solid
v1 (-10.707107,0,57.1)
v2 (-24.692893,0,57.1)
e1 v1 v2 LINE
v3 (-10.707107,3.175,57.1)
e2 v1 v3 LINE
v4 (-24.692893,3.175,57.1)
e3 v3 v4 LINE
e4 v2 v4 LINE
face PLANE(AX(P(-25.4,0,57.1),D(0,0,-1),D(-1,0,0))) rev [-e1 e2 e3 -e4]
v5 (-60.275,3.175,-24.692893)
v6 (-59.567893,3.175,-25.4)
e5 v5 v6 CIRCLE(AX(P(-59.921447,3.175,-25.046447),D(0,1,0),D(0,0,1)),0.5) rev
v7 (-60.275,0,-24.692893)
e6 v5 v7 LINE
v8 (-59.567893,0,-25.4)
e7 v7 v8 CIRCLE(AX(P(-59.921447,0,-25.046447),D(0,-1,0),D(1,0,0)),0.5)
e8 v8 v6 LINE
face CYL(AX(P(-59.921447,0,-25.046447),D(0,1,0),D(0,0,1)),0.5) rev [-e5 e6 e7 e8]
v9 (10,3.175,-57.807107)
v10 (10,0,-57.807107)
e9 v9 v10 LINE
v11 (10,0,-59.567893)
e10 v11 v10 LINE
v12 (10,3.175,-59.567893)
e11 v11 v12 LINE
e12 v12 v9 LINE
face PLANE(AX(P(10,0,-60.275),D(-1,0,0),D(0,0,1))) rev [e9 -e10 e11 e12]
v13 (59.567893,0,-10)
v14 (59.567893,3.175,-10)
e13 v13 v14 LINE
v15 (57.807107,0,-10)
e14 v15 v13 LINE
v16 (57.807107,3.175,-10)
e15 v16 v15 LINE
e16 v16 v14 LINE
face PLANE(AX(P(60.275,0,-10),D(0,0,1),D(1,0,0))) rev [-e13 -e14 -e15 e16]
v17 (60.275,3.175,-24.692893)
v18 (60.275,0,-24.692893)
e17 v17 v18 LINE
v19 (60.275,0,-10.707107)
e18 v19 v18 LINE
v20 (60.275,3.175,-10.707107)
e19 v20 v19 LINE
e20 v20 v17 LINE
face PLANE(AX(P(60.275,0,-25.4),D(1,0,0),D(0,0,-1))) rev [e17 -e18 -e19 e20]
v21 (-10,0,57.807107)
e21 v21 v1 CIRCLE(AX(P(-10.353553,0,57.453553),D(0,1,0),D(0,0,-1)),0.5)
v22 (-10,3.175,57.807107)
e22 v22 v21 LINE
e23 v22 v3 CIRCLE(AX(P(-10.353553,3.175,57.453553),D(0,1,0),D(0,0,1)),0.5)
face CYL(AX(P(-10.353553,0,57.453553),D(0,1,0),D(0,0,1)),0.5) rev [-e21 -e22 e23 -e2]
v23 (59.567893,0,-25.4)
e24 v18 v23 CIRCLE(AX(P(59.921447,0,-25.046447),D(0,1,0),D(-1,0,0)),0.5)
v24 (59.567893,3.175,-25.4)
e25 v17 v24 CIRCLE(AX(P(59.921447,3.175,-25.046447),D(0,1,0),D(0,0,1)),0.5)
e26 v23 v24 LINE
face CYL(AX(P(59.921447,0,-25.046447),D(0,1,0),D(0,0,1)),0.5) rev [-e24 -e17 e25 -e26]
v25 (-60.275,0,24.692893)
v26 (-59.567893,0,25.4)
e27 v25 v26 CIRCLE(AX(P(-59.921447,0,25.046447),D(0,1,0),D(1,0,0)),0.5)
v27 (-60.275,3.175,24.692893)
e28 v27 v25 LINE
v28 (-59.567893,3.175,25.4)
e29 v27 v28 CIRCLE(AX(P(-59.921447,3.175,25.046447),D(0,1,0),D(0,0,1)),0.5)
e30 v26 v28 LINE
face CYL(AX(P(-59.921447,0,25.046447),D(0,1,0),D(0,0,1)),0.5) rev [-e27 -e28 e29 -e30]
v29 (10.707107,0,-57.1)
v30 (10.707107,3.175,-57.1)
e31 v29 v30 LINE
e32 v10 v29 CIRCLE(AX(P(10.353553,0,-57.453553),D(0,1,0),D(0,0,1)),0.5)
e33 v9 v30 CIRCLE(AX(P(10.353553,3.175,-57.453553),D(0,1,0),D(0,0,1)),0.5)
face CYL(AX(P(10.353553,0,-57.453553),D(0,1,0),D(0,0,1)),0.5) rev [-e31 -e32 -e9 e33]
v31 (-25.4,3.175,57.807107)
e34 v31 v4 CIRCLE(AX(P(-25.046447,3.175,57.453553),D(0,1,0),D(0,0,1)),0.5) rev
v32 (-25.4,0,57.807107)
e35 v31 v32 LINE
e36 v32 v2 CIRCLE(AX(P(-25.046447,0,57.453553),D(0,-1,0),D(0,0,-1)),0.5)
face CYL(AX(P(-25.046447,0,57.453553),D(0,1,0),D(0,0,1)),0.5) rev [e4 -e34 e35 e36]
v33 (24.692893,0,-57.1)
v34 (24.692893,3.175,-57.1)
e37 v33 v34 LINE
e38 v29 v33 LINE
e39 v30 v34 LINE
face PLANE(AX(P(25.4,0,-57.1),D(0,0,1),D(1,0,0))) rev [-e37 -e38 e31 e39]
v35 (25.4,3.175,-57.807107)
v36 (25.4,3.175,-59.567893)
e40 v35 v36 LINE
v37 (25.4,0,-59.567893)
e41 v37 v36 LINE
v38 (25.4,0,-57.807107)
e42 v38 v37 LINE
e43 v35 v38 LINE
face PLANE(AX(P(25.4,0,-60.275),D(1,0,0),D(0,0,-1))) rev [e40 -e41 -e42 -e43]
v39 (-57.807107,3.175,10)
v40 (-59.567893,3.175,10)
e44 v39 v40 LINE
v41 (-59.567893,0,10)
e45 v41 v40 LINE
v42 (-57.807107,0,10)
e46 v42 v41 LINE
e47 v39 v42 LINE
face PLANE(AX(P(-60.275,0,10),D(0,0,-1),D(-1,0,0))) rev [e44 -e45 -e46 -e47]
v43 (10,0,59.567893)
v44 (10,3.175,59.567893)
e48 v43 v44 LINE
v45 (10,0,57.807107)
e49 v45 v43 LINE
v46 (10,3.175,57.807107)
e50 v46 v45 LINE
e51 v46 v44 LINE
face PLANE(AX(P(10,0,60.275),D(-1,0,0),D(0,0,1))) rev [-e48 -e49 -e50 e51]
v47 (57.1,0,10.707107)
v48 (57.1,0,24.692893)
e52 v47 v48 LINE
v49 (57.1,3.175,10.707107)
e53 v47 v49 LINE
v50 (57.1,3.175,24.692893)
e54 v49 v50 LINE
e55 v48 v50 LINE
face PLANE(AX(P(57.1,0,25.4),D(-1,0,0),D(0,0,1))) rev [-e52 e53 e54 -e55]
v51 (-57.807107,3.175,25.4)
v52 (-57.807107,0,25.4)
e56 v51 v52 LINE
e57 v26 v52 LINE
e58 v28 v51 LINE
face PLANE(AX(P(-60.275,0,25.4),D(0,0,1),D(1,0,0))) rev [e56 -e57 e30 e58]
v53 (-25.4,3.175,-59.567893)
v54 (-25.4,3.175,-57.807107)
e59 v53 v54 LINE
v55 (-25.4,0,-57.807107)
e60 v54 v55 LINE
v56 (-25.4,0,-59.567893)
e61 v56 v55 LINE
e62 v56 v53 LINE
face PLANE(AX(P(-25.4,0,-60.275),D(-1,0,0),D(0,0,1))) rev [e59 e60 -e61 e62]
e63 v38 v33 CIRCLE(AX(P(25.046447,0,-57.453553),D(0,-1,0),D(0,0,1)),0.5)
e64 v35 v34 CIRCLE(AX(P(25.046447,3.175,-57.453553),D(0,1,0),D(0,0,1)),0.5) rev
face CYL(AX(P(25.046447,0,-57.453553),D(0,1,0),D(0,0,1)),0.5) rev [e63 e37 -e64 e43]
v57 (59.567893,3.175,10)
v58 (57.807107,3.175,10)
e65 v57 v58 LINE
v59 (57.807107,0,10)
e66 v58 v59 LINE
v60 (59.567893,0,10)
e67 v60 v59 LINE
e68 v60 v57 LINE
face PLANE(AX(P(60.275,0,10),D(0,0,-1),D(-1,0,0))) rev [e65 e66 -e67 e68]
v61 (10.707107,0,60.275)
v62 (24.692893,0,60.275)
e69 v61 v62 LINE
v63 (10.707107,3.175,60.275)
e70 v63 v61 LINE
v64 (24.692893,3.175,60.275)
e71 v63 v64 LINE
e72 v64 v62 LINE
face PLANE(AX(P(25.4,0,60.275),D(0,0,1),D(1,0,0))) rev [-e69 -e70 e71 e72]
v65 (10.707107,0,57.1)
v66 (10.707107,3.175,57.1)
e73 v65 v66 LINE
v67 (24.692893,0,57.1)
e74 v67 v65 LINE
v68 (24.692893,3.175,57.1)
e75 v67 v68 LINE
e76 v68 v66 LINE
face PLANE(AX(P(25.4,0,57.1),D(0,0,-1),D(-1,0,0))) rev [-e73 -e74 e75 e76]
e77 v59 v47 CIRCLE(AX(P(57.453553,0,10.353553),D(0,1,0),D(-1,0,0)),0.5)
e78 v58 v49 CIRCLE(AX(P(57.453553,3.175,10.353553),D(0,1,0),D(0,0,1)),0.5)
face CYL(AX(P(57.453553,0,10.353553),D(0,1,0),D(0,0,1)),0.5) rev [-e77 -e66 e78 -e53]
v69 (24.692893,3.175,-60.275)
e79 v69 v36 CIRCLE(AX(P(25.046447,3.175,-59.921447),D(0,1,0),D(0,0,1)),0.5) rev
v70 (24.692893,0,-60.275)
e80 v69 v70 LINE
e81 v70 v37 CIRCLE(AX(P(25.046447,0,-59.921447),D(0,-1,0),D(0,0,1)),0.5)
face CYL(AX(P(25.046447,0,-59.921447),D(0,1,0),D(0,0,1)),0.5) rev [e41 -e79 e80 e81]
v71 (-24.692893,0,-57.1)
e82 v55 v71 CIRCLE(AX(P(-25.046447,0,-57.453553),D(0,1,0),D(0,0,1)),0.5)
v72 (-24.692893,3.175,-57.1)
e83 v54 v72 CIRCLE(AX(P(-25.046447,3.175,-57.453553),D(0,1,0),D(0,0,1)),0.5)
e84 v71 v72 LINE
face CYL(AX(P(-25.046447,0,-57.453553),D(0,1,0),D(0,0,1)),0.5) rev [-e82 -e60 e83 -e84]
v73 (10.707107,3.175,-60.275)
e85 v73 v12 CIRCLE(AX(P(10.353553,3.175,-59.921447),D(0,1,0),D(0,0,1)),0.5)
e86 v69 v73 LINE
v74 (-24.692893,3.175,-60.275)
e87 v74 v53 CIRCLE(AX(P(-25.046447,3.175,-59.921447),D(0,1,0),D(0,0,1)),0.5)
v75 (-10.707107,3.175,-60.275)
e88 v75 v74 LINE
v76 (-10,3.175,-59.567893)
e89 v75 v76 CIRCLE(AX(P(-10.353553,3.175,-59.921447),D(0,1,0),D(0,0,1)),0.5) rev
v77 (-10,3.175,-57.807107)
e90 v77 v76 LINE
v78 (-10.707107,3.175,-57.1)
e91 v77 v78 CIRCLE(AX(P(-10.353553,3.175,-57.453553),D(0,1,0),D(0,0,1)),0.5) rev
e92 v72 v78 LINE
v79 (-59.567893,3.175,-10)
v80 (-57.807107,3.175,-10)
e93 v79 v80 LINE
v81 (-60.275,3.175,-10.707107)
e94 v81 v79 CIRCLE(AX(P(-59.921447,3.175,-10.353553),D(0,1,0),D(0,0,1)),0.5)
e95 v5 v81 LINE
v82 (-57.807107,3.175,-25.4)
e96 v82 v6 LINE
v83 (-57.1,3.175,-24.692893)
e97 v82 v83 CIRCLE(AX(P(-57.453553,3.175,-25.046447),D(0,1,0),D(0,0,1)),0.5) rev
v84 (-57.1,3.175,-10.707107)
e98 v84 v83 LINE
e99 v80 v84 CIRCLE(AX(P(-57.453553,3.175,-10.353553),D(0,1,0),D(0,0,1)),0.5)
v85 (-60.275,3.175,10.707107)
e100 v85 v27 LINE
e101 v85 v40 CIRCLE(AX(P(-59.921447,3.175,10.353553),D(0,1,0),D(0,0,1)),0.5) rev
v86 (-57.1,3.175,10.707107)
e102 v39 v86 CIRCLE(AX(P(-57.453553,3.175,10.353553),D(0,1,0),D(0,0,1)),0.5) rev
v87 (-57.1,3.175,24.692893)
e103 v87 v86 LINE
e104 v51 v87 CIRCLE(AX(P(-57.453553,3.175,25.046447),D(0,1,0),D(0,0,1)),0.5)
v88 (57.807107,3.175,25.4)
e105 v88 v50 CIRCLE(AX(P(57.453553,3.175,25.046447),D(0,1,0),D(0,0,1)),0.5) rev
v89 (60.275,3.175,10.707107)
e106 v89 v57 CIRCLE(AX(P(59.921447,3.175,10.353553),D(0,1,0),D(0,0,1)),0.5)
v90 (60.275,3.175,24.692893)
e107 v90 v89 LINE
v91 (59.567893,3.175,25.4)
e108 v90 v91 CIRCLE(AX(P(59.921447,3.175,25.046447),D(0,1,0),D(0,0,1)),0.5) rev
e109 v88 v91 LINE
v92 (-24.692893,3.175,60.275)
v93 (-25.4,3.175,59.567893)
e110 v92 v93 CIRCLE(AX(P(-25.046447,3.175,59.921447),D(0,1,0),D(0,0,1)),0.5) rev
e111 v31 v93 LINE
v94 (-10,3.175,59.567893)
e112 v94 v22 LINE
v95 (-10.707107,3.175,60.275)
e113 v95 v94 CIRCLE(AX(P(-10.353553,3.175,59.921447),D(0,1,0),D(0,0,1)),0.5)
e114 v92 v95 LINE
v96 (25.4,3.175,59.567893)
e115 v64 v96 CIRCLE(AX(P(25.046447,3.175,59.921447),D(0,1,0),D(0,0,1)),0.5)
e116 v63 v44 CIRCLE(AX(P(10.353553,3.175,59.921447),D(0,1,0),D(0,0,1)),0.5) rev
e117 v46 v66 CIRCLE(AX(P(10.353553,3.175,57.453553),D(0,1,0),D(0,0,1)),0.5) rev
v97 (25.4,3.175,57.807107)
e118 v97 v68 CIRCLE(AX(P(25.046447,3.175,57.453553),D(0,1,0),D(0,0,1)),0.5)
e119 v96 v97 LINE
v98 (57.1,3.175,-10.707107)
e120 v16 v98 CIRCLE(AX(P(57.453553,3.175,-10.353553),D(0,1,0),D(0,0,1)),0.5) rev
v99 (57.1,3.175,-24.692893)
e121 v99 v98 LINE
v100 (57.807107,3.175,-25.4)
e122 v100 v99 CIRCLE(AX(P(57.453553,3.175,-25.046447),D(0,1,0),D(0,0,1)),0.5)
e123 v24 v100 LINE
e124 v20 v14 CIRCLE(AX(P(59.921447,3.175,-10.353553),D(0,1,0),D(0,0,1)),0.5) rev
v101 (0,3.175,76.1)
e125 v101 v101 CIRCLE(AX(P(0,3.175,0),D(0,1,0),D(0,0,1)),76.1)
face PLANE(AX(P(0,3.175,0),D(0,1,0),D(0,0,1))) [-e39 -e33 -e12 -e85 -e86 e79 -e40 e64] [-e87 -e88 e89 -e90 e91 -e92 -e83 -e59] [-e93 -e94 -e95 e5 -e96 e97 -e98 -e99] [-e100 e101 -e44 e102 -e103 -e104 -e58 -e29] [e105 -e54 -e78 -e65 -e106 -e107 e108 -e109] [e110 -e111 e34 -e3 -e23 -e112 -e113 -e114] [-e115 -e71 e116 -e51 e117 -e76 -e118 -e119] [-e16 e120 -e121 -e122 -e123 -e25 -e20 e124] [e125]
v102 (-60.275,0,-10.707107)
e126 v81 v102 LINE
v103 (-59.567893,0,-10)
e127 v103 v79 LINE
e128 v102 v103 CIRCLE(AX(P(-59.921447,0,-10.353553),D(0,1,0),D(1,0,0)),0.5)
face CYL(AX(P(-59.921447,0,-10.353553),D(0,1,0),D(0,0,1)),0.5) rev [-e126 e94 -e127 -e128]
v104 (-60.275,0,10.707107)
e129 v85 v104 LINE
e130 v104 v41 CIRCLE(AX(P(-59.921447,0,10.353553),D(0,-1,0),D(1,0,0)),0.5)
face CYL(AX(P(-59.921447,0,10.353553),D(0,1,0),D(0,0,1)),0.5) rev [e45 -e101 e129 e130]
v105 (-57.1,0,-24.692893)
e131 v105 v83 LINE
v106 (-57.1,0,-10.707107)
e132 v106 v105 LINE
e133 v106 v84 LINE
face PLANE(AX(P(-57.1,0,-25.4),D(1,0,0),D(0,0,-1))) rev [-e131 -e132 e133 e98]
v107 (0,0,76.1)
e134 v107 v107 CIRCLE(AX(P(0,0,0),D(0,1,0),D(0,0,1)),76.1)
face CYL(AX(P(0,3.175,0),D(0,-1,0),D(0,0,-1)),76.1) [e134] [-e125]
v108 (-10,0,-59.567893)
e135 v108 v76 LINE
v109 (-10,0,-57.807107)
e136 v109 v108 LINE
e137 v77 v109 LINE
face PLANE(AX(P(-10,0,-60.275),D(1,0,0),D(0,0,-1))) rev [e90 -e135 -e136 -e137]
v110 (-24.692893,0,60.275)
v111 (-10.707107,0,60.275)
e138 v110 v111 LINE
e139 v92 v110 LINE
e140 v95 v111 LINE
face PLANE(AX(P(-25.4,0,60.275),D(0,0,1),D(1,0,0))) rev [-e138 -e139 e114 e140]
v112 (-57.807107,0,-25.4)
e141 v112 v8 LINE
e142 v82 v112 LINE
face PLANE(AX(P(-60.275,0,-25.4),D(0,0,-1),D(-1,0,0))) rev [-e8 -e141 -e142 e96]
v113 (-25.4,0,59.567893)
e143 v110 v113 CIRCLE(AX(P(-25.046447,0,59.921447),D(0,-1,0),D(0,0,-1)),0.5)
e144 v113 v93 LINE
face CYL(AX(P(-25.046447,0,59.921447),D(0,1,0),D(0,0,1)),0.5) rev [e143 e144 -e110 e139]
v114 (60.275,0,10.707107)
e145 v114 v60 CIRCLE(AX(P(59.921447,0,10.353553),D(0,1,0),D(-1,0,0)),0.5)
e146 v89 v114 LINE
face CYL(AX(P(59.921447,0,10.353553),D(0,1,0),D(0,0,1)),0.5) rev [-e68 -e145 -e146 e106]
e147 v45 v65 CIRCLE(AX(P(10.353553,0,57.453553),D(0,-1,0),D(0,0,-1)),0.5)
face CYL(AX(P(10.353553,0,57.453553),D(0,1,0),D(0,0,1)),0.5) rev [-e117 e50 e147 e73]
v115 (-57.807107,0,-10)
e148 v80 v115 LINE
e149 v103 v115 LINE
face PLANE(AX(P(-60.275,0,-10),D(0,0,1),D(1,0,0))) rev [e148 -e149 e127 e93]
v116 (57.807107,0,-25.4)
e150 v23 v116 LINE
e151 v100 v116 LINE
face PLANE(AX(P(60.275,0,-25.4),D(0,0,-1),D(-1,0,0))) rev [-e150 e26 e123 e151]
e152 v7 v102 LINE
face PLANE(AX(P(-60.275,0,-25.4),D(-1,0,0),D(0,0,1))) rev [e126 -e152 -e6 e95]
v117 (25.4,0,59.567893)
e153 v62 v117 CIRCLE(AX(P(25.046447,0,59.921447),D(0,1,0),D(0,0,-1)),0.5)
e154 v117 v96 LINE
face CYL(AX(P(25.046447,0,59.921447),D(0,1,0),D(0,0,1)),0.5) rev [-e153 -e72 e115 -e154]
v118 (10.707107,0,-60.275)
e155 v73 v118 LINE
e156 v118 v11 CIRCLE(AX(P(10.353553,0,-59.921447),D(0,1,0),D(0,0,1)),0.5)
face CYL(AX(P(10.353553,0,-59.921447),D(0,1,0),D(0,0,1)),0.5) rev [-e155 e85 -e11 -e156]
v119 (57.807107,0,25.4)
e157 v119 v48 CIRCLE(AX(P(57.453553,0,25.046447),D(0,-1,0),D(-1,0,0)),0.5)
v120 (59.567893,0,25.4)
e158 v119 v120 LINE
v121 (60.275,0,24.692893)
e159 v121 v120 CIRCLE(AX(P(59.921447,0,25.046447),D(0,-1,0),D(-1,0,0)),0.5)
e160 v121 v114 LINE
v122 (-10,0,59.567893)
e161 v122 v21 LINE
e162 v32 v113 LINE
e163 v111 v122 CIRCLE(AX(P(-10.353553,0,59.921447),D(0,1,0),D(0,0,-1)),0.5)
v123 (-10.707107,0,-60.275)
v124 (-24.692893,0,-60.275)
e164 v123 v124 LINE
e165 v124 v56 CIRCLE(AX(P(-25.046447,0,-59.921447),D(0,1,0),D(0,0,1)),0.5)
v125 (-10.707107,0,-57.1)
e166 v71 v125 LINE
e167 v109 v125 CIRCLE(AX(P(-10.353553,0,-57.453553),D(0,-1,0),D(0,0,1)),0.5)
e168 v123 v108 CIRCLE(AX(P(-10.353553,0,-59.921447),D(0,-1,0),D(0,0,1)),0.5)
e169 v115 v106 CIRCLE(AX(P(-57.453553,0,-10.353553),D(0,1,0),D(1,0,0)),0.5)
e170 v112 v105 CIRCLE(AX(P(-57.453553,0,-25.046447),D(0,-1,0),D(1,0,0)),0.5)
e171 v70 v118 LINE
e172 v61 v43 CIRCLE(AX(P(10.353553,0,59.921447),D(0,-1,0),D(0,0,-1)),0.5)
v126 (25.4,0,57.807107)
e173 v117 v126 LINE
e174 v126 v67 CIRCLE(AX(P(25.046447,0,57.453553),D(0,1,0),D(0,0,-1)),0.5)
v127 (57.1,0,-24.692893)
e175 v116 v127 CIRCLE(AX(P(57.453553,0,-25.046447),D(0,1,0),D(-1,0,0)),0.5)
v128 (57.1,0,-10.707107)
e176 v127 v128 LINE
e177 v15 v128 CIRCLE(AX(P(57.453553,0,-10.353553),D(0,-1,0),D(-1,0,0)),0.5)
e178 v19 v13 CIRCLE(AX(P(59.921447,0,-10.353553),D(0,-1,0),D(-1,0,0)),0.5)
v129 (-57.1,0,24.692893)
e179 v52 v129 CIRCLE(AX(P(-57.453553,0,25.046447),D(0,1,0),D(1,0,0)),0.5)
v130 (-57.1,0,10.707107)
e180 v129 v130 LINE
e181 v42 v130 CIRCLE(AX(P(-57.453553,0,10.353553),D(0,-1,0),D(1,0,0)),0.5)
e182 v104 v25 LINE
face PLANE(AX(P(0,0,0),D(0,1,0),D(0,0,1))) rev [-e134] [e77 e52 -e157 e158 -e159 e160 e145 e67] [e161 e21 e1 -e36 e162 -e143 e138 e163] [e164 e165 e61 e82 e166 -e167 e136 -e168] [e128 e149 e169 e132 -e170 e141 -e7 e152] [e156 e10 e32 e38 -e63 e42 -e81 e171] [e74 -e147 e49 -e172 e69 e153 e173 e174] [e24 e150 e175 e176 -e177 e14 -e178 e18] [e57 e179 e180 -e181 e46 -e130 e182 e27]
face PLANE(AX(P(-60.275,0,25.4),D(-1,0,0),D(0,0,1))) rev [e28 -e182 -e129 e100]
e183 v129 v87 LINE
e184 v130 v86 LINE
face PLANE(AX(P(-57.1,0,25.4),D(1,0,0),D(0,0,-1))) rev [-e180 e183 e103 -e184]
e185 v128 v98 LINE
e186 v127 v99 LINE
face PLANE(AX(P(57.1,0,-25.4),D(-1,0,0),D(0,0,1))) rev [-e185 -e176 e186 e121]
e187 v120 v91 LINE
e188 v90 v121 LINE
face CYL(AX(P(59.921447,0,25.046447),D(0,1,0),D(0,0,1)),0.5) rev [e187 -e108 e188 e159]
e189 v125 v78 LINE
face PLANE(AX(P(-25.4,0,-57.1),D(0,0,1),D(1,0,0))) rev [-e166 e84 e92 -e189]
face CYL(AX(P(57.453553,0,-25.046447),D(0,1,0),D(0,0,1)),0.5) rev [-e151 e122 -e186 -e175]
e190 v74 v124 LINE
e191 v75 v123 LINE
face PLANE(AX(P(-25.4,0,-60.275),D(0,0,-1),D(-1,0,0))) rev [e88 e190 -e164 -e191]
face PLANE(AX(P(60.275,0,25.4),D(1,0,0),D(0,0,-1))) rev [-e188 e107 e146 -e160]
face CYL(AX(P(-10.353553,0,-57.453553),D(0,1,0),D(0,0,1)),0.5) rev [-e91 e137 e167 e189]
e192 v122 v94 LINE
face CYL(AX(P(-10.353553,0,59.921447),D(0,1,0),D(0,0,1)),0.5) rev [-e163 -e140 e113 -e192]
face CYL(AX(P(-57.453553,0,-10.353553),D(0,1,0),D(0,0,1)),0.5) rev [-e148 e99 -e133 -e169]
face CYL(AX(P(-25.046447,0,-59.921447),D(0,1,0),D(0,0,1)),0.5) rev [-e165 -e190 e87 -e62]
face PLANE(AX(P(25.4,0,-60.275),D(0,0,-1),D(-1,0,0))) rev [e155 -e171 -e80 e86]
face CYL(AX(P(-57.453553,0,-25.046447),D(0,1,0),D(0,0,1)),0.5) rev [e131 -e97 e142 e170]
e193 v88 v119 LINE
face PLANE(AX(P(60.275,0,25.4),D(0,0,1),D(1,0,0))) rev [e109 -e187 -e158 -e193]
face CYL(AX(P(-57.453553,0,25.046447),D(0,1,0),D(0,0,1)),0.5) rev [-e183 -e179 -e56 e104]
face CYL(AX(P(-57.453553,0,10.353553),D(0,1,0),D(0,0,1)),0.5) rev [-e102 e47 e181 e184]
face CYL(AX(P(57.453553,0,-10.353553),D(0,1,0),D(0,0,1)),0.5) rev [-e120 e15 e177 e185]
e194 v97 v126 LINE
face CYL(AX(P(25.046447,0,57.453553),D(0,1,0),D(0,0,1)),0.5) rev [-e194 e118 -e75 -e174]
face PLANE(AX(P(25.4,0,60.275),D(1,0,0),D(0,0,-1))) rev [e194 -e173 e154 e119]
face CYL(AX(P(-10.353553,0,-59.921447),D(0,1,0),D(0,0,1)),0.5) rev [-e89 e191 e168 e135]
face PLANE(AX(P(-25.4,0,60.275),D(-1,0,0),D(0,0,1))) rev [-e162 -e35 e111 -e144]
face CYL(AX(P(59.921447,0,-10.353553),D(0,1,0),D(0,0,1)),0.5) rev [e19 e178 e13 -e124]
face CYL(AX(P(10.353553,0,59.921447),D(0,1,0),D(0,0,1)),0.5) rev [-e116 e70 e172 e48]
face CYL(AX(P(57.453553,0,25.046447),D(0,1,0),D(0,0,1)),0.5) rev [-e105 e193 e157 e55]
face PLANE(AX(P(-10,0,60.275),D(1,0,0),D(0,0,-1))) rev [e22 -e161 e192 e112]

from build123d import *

# Parameters (mm, degrees)
SKETCH1_R                   = 76.1
BOSS_EXTRUDE1_DEPTH         = 3.175
SKETCH3_W                   = 15.4
SKETCH3_H                   = 3.175
CUT_EXTRUDE1_DEPTH          = 108.66847554
SKETCH4_R                   = 0.5
CUT_EXTRUDE2_DEPTH          = 108.66847554
SKETCH_PATTERN1_DEPTH       = 3.175
CIRPATTERN1_COUNT           = 4
CIRPATTERN1_COPY_1_SKETCH_R = 0.5
CIRPATTERN1_COPY_1_DEPTH    = 108.66847554
CIRPATTERN1_COPY_2_SKETCH_R = 0.5
CIRPATTERN1_COPY_2_DEPTH    = 108.66847554
CIRPATTERN1_COPY_3_SKETCH_R = 0.5
CIRPATTERN1_COPY_3_DEPTH    = 108.66847554
CIRPATTERN1_COPY_4_DEPTH    = 3.175
CIRPATTERN1_COPY_5_DEPTH    = 3.175
CIRPATTERN1_COPY_6_DEPTH    = 3.175


# Read off the part's stored shape, not the designer's step: Sketch-Pattern1
with BuildPart() as part:
    # Sketch1 → Boss-Extrude1 (new body)
    with BuildSketch(Plane(origin=(0, 0, 0), x_dir=(1, 0, 0), z_dir=(0, 1, 0))):
        with Locations(Location((0, 0, 0), (0, 0, 270))):
            Circle(SKETCH1_R)
    extrude(amount=BOSS_EXTRUDE1_DEPTH)

    # Sketch3 → Cut-Extrude1 (cut, symmetric)
    with BuildSketch(Plane(origin=(0, 3.175, 0), x_dir=(1, 0, 0), z_dir=(0, 1, 0))):
        with Locations((-17.7, 58.6875)):
            Rectangle(SKETCH3_W, SKETCH3_H)
        with Locations((17.7, 58.6875)):
            Rectangle(SKETCH3_W, SKETCH3_H)
    cut_extrude1 = extrude(amount=CUT_EXTRUDE1_DEPTH, both=True, mode=Mode.SUBTRACT)

    # Sketch4 → Cut-Extrude2 (cut, symmetric)
    with BuildSketch(Plane(origin=(0, 3.175, 0), x_dir=(1, 0, 0), z_dir=(0, 1, 0))):
        with Locations((-25.046446609, 59.921446609)):
            Circle(SKETCH4_R)
        with Locations((-25.046446609, 57.453553391)):
            Circle(SKETCH4_R)
    cut_extrude2 = extrude(amount=CUT_EXTRUDE2_DEPTH, both=True, mode=Mode.SUBTRACT)

    # Sketch-Pattern1 outline → Sketch-Pattern1 (cut)
    with BuildSketch(Plane(origin=(0, 0, 0), x_dir=(1, 0, 0), z_dir=(0, 1, 0))):
        with BuildLine():
            Line((10, 60.275), (10.707106781, 60.275))
            ThreePointArc((10.707106781, 60.275), (10.353553391, 60.421446609), (10, 60.275))
        make_face()
        with BuildLine():
            Line((10.707106781, 57.1), (10, 57.1))
            ThreePointArc((10, 57.1), (10.353553391, 56.953553391), (10.707106781, 57.1))
        make_face()
        with BuildLine():
            Line((10, 57.1), (10, 57.807106781))
            ThreePointArc((10, 57.807106781), (9.853553391, 57.453553391), (10, 57.1))
        make_face()
        with BuildLine():
            Line((10, 59.567893219), (10, 60.275))
            ThreePointArc((10, 60.275), (9.853553391, 59.921446609), (10, 59.567893219))
        make_face()
    sketch_pattern1 = extrude(amount=SKETCH_PATTERN1_DEPTH, mode=Mode.SUBTRACT)

    # Mirror1: Cut-Extrude2, Sketch-Pattern1 across plane
    add(cut_extrude2.mirror(Plane(origin=(0, 0, 0), x_dir=(0, 0, 1), z_dir=(1, 0, 0))), mode=Mode.SUBTRACT)
    add(sketch_pattern1.mirror(Plane(origin=(0, 0, 0), x_dir=(0, 0, 1), z_dir=(1, 0, 0))), mode=Mode.SUBTRACT)

    # CirPattern1: Cut-Extrude1, Cut-Extrude2, Sketch-Pattern1 ×4 about axis
    cirpattern1_axis = Axis((0, 0, 0), (0, 1, 0))
    add([cut_extrude1.rotate(cirpattern1_axis, i * 360 / CIRPATTERN1_COUNT) for i in range(1, CIRPATTERN1_COUNT)], mode=Mode.SUBTRACT)
    add([cut_extrude2.rotate(cirpattern1_axis, i * 360 / CIRPATTERN1_COUNT) for i in range(1, CIRPATTERN1_COUNT)], mode=Mode.SUBTRACT)
    add([sketch_pattern1.rotate(cirpattern1_axis, i * 360 / CIRPATTERN1_COUNT) for i in range(1, CIRPATTERN1_COUNT)], mode=Mode.SUBTRACT)

    # CirPattern1 copy 1 sketch → CirPattern1 copy 1 (cut, symmetric)
    with BuildSketch(Plane.ZX.offset(3.175)):
        with Locations((-25.046446609, -59.921446609)):
            Circle(CIRPATTERN1_COPY_1_SKETCH_R)
        with Locations((-25.046446609, -57.453553391)):
            Circle(CIRPATTERN1_COPY_1_SKETCH_R)
    extrude(amount=CIRPATTERN1_COPY_1_DEPTH, both=True, mode=Mode.SUBTRACT)

    # CirPattern1 copy 2 sketch → CirPattern1 copy 2 (cut, symmetric)
    with BuildSketch(Plane(origin=(0, 3.175, 0), x_dir=(1, 0, 0), z_dir=(0, 1, 0))):
        with Locations((-25.046446609, -59.921446609)):
            Circle(CIRPATTERN1_COPY_2_SKETCH_R)
        with Locations((-25.046446609, -57.453553391)):
            Circle(CIRPATTERN1_COPY_2_SKETCH_R)
    extrude(amount=CIRPATTERN1_COPY_2_DEPTH, both=True, mode=Mode.SUBTRACT)

    # CirPattern1 copy 3 sketch → CirPattern1 copy 3 (cut, symmetric)
    with BuildSketch(Plane(origin=(0, 3.175, 0), x_dir=(0, 0, -1), z_dir=(0, 1, 0))):
        with Locations((-25.046446609, -59.921446609)):
            Circle(CIRPATTERN1_COPY_3_SKETCH_R)
        with Locations((-25.046446609, -57.453553391)):
            Circle(CIRPATTERN1_COPY_3_SKETCH_R)
    extrude(amount=CIRPATTERN1_COPY_3_DEPTH, both=True, mode=Mode.SUBTRACT)

    # CirPattern1 copy 4 sketch → CirPattern1 copy 4 (cut)
    with BuildSketch(Plane.ZX):
        with BuildLine():
            Line((10, -60.275), (10.707106781, -60.275))
            ThreePointArc((10.707106781, -60.275), (10.353553391, -60.421446609), (10, -60.275))
        make_face()
        with BuildLine():
            Line((10.707106781, -57.1), (10, -57.1))
            ThreePointArc((10, -57.1), (10.353553391, -56.953553391), (10.707106781, -57.1))
        make_face()
        with BuildLine():
            Line((10, -57.1), (10, -57.807106781))
            ThreePointArc((10, -57.807106781), (9.853553391, -57.453553391), (10, -57.1))
        make_face()
        with BuildLine():
            Line((10, -59.567893219), (10, -60.275))
            ThreePointArc((10, -60.275), (9.853553391, -59.921446609), (10, -59.567893219))
        make_face()
    extrude(amount=CIRPATTERN1_COPY_4_DEPTH, mode=Mode.SUBTRACT)

    # CirPattern1 copy 5 sketch → CirPattern1 copy 5 (cut)
    with BuildSketch(Plane(origin=(0, 0, 0), x_dir=(1, 0, 0), z_dir=(0, 1, 0))):
        with BuildLine():
            Line((10, -60.275), (10.707106781, -60.275))
            ThreePointArc((10.707106781, -60.275), (10.353553391, -60.421446609), (10, -60.275))
        make_face()
        with BuildLine():
            Line((10.707106781, -57.1), (10, -57.1))
            ThreePointArc((10, -57.1), (10.353553391, -56.953553391), (10.707106781, -57.1))
        make_face()
        with BuildLine():
            Line((10, -57.1), (10, -57.807106781))
            ThreePointArc((10, -57.807106781), (9.853553391, -57.453553391), (10, -57.1))
        make_face()
        with BuildLine():
            Line((10, -59.567893219), (10, -60.275))
            ThreePointArc((10, -60.275), (9.853553391, -59.921446609), (10, -59.567893219))
        make_face()
    extrude(amount=CIRPATTERN1_COPY_5_DEPTH, mode=Mode.SUBTRACT)

    # CirPattern1 copy 6 sketch → CirPattern1 copy 6 (cut)
    with BuildSketch(Plane(origin=(0, 0, 0), x_dir=(0, 0, -1), z_dir=(0, 1, 0))):
        with BuildLine():
            Line((10, -60.275), (10.707106781, -60.275))
            ThreePointArc((10.707106781, -60.275), (10.353553391, -60.421446609), (10, -60.275))
        make_face()
        with BuildLine():
            Line((10.707106781, -57.1), (10, -57.1))
            ThreePointArc((10, -57.1), (10.353553391, -56.953553391), (10.707106781, -57.1))
        make_face()
        with BuildLine():
            Line((10, -57.1), (10, -57.807106781))
            ThreePointArc((10, -57.807106781), (9.853553391, -57.453553391), (10, -57.1))
        make_face()
        with BuildLine():
            Line((10, -59.567893219), (10, -60.275))
            ThreePointArc((10, -60.275), (9.853553391, -59.921446609), (10, -59.567893219))
        make_face()
    extrude(amount=CIRPATTERN1_COPY_6_DEPTH, mode=Mode.SUBTRACT)


solid = part.part
